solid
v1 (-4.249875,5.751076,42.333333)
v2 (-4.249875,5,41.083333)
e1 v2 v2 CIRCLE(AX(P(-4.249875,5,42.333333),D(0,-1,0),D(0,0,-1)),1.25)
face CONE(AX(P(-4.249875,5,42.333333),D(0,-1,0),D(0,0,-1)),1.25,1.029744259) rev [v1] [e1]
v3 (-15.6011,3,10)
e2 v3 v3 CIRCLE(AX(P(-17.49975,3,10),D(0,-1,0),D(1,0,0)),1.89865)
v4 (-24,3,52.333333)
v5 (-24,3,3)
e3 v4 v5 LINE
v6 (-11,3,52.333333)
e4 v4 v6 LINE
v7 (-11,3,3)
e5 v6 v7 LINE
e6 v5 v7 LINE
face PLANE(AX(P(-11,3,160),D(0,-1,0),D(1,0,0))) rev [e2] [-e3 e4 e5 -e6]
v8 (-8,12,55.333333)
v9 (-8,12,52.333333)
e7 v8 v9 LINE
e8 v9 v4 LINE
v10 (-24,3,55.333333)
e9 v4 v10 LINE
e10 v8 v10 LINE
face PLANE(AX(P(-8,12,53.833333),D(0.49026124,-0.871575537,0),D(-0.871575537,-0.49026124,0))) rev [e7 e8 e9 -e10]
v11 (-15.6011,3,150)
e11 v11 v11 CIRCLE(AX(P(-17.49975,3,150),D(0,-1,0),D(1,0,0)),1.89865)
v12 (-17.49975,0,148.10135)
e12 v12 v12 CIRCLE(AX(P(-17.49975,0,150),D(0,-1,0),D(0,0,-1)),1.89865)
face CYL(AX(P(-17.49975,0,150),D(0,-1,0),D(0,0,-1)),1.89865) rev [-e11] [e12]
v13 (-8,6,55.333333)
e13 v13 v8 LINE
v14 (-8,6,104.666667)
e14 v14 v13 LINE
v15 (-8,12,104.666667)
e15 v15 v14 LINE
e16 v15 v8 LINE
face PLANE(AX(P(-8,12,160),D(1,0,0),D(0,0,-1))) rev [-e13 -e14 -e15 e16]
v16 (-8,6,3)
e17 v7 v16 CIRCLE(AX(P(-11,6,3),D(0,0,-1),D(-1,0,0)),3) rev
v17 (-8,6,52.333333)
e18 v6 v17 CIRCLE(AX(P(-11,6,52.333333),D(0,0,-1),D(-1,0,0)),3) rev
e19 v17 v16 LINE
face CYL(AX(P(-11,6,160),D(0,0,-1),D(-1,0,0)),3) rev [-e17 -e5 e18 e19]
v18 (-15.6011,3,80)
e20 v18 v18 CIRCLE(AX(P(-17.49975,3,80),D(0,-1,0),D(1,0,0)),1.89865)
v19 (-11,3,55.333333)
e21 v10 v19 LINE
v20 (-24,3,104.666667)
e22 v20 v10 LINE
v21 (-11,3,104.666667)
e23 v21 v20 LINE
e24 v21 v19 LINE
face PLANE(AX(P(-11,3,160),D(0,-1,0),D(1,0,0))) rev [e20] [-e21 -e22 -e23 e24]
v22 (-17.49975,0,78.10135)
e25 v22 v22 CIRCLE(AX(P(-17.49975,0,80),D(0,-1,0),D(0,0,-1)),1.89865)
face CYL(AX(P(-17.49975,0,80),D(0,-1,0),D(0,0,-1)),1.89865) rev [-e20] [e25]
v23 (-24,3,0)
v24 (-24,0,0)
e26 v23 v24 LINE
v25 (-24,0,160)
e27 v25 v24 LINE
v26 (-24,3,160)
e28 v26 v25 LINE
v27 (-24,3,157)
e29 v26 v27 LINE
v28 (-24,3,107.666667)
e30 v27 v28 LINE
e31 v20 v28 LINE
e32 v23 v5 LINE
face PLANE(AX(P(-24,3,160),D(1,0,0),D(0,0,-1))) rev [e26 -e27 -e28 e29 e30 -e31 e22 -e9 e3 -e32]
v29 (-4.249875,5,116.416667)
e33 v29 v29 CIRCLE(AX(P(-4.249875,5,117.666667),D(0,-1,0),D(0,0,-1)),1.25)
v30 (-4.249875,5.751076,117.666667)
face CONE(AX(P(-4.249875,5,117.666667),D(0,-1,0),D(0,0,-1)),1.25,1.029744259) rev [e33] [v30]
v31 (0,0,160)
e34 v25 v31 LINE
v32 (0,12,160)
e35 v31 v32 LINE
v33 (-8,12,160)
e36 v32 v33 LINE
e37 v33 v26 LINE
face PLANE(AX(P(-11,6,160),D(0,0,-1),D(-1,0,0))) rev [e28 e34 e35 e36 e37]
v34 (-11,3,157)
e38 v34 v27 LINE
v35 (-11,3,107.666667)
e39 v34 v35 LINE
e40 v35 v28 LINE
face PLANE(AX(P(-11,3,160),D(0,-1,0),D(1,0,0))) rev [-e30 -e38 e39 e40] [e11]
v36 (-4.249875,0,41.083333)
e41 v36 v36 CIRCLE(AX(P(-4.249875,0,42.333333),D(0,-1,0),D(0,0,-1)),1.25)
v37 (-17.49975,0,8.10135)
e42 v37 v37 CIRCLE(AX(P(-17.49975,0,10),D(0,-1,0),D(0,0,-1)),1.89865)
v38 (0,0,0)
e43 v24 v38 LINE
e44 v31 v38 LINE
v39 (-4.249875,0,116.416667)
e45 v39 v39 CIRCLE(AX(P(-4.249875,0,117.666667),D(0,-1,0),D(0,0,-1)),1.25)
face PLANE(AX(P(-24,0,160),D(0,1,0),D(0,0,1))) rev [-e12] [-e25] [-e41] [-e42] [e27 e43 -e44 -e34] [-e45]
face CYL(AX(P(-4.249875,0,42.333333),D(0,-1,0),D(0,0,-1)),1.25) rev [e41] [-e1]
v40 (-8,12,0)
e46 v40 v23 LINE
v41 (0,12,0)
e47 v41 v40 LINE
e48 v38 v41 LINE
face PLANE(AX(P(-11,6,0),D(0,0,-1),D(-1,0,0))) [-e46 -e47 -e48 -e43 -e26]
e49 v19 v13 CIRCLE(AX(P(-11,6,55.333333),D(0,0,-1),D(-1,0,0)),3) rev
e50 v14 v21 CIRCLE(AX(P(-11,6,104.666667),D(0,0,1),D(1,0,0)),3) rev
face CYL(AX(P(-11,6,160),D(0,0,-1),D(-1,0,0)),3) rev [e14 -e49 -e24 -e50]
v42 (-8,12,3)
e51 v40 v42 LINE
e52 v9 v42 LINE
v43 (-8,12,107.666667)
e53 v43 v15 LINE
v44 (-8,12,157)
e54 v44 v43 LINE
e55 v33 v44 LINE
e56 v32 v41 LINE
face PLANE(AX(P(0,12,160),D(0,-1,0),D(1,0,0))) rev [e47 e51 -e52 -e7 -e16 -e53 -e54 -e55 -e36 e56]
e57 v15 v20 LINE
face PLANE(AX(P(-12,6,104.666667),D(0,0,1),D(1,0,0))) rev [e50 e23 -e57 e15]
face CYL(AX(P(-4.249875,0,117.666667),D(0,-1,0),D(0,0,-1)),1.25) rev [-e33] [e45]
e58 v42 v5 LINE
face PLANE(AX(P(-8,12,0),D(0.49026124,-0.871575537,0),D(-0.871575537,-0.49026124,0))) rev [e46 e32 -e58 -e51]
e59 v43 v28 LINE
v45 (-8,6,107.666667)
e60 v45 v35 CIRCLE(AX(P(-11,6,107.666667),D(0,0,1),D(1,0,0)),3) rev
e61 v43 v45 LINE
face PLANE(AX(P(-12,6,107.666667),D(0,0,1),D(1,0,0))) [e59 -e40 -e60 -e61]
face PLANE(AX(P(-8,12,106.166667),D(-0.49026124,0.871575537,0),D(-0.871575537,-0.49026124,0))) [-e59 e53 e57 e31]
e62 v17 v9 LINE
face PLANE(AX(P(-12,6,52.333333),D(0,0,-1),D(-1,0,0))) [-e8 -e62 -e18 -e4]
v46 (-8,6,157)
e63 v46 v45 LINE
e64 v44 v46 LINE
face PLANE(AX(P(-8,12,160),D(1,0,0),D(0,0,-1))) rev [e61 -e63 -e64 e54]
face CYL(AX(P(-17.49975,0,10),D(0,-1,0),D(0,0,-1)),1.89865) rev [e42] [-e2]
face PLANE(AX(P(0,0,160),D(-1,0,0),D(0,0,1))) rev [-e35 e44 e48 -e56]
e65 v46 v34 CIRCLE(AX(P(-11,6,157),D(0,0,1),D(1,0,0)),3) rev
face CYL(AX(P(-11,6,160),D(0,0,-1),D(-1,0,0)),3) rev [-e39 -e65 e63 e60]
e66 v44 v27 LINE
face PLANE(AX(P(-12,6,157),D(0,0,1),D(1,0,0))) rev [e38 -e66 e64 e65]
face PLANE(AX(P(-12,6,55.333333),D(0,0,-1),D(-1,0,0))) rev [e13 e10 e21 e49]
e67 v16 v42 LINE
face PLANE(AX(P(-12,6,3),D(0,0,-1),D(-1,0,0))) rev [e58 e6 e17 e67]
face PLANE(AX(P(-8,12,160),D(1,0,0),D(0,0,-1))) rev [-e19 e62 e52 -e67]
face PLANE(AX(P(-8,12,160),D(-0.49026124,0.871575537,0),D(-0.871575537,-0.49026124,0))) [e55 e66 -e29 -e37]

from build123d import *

# Parameters (mm, degrees)
BOSS_EXTRUDE1_DEPTH             = 160
RIB3_REACH                      = 111.505
SKETCH4_WALL_W                  = 239.367706636
SKETCH4_WALL_H                  = 3
RIB4_REACH                      = 164.234
SKETCH5_WALL_W                  = 344.826356402
SKETCH5_WALL_H                  = 3
F_6_CLEARANCE_HOLE1_D           = 3.7973
TAP_DRILL_FOR_M3X0_5_TAP1_D     = 2.5
TAP_DRILL_FOR_M3X0_5_TAP1_DEPTH = 5
TAP_DRILL_FOR_M3X0_5_TAP1_TIP   = 0.751075774


with BuildPart() as part:
    # Sketch1 → Boss-Extrude1 (new body)
    with BuildSketch(Plane.XY):
        with BuildLine():
            Line((0, 0), (0, 12))
            Line((0, 12), (-8, 12))
            Line((-8, 12), (-8, 6))
            ThreePointArc((-8, 6), (-8.878679656, 3.878679656), (-11, 3))
            Line((-11, 3), (-24, 3))
            Line((-24, 3), (-24, 0))
            Line((-24, 0), (0, 0))
        make_face()
    extrude(amount=BOSS_EXTRUDE1_DEPTH)

    # Sketch4 wall → Rib3 (add, up to next)
    with BuildSketch(Plane(origin=(-16, 7.5, 53.83333334), x_dir=(-0.871575537125, -0.490261239633, 0), z_dir=(-0.490261239633, 0.871575537125, 0)), mode=Mode.PRIVATE) as rib3_sk1:
        Rectangle(SKETCH4_WALL_W, SKETCH4_WALL_H)
    rib3_tool1 = extrude(rib3_sk1.sketch, amount=-RIB3_REACH, mode=Mode.PRIVATE) - part.part
    rib3 = rib3_tool1.solids().sort_by_distance((-16, 7.5, 53.83333334))[0]
    add(rib3)

    # Sketch5 wall → Rib4 (add, up to next)
    with BuildSketch(Plane(origin=(-16, 7.5, 0), x_dir=(-0.871575537125, -0.490261239633, 0), z_dir=(-0.490261239633, 0.871575537125, 0)), mode=Mode.PRIVATE) as rib4_sk1:
        with Locations((0, 1.5)):
            Rectangle(SKETCH5_WALL_W, SKETCH5_WALL_H)
    rib4_tool1 = extrude(rib4_sk1.sketch, amount=-RIB4_REACH, mode=Mode.PRIVATE) - part.part
    rib4 = rib4_tool1.solids().sort_by_distance((-16, 7.5, 0))[0]
    add(rib4)

    # Mirror1: Rib3, Rib4 across plane
    add(rib3.mirror(Plane(origin=(0, 0, 80), x_dir=(1, 0, 0), z_dir=(0, 0, -1))))
    add(rib4.mirror(Plane(origin=(0, 0, 80), x_dir=(1, 0, 0), z_dir=(0, 0, -1))))

    # #6 Clearance Hole1 (through all)
    with Locations(Plane(origin=(0, 0, 0), x_dir=(-1, 0, 0), z_dir=(0, -1, 0))):
        with Locations((17.49975, -10), (17.49975, -80), (17.49975, -150)):
            Hole(F_6_CLEARANCE_HOLE1_D / 2)

    # Tap Drill for M3x0.5 Tap1
    with Locations(Plane(origin=(0, 0, 0), x_dir=(-1, 0, 0), z_dir=(0, -1, 0))):
        with Locations((4.249875, -42.33333334), (4.249875, -117.66666666)):
            Hole(TAP_DRILL_FOR_M3X0_5_TAP1_D / 2, depth=TAP_DRILL_FOR_M3X0_5_TAP1_DEPTH)
            with Locations((0, 0, -(TAP_DRILL_FOR_M3X0_5_TAP1_DEPTH + TAP_DRILL_FOR_M3X0_5_TAP1_TIP / 2))):  # 118° drill point
                Cone(0, TAP_DRILL_FOR_M3X0_5_TAP1_D / 2, TAP_DRILL_FOR_M3X0_5_TAP1_TIP, mode=Mode.SUBTRACT)


solid = part.part
